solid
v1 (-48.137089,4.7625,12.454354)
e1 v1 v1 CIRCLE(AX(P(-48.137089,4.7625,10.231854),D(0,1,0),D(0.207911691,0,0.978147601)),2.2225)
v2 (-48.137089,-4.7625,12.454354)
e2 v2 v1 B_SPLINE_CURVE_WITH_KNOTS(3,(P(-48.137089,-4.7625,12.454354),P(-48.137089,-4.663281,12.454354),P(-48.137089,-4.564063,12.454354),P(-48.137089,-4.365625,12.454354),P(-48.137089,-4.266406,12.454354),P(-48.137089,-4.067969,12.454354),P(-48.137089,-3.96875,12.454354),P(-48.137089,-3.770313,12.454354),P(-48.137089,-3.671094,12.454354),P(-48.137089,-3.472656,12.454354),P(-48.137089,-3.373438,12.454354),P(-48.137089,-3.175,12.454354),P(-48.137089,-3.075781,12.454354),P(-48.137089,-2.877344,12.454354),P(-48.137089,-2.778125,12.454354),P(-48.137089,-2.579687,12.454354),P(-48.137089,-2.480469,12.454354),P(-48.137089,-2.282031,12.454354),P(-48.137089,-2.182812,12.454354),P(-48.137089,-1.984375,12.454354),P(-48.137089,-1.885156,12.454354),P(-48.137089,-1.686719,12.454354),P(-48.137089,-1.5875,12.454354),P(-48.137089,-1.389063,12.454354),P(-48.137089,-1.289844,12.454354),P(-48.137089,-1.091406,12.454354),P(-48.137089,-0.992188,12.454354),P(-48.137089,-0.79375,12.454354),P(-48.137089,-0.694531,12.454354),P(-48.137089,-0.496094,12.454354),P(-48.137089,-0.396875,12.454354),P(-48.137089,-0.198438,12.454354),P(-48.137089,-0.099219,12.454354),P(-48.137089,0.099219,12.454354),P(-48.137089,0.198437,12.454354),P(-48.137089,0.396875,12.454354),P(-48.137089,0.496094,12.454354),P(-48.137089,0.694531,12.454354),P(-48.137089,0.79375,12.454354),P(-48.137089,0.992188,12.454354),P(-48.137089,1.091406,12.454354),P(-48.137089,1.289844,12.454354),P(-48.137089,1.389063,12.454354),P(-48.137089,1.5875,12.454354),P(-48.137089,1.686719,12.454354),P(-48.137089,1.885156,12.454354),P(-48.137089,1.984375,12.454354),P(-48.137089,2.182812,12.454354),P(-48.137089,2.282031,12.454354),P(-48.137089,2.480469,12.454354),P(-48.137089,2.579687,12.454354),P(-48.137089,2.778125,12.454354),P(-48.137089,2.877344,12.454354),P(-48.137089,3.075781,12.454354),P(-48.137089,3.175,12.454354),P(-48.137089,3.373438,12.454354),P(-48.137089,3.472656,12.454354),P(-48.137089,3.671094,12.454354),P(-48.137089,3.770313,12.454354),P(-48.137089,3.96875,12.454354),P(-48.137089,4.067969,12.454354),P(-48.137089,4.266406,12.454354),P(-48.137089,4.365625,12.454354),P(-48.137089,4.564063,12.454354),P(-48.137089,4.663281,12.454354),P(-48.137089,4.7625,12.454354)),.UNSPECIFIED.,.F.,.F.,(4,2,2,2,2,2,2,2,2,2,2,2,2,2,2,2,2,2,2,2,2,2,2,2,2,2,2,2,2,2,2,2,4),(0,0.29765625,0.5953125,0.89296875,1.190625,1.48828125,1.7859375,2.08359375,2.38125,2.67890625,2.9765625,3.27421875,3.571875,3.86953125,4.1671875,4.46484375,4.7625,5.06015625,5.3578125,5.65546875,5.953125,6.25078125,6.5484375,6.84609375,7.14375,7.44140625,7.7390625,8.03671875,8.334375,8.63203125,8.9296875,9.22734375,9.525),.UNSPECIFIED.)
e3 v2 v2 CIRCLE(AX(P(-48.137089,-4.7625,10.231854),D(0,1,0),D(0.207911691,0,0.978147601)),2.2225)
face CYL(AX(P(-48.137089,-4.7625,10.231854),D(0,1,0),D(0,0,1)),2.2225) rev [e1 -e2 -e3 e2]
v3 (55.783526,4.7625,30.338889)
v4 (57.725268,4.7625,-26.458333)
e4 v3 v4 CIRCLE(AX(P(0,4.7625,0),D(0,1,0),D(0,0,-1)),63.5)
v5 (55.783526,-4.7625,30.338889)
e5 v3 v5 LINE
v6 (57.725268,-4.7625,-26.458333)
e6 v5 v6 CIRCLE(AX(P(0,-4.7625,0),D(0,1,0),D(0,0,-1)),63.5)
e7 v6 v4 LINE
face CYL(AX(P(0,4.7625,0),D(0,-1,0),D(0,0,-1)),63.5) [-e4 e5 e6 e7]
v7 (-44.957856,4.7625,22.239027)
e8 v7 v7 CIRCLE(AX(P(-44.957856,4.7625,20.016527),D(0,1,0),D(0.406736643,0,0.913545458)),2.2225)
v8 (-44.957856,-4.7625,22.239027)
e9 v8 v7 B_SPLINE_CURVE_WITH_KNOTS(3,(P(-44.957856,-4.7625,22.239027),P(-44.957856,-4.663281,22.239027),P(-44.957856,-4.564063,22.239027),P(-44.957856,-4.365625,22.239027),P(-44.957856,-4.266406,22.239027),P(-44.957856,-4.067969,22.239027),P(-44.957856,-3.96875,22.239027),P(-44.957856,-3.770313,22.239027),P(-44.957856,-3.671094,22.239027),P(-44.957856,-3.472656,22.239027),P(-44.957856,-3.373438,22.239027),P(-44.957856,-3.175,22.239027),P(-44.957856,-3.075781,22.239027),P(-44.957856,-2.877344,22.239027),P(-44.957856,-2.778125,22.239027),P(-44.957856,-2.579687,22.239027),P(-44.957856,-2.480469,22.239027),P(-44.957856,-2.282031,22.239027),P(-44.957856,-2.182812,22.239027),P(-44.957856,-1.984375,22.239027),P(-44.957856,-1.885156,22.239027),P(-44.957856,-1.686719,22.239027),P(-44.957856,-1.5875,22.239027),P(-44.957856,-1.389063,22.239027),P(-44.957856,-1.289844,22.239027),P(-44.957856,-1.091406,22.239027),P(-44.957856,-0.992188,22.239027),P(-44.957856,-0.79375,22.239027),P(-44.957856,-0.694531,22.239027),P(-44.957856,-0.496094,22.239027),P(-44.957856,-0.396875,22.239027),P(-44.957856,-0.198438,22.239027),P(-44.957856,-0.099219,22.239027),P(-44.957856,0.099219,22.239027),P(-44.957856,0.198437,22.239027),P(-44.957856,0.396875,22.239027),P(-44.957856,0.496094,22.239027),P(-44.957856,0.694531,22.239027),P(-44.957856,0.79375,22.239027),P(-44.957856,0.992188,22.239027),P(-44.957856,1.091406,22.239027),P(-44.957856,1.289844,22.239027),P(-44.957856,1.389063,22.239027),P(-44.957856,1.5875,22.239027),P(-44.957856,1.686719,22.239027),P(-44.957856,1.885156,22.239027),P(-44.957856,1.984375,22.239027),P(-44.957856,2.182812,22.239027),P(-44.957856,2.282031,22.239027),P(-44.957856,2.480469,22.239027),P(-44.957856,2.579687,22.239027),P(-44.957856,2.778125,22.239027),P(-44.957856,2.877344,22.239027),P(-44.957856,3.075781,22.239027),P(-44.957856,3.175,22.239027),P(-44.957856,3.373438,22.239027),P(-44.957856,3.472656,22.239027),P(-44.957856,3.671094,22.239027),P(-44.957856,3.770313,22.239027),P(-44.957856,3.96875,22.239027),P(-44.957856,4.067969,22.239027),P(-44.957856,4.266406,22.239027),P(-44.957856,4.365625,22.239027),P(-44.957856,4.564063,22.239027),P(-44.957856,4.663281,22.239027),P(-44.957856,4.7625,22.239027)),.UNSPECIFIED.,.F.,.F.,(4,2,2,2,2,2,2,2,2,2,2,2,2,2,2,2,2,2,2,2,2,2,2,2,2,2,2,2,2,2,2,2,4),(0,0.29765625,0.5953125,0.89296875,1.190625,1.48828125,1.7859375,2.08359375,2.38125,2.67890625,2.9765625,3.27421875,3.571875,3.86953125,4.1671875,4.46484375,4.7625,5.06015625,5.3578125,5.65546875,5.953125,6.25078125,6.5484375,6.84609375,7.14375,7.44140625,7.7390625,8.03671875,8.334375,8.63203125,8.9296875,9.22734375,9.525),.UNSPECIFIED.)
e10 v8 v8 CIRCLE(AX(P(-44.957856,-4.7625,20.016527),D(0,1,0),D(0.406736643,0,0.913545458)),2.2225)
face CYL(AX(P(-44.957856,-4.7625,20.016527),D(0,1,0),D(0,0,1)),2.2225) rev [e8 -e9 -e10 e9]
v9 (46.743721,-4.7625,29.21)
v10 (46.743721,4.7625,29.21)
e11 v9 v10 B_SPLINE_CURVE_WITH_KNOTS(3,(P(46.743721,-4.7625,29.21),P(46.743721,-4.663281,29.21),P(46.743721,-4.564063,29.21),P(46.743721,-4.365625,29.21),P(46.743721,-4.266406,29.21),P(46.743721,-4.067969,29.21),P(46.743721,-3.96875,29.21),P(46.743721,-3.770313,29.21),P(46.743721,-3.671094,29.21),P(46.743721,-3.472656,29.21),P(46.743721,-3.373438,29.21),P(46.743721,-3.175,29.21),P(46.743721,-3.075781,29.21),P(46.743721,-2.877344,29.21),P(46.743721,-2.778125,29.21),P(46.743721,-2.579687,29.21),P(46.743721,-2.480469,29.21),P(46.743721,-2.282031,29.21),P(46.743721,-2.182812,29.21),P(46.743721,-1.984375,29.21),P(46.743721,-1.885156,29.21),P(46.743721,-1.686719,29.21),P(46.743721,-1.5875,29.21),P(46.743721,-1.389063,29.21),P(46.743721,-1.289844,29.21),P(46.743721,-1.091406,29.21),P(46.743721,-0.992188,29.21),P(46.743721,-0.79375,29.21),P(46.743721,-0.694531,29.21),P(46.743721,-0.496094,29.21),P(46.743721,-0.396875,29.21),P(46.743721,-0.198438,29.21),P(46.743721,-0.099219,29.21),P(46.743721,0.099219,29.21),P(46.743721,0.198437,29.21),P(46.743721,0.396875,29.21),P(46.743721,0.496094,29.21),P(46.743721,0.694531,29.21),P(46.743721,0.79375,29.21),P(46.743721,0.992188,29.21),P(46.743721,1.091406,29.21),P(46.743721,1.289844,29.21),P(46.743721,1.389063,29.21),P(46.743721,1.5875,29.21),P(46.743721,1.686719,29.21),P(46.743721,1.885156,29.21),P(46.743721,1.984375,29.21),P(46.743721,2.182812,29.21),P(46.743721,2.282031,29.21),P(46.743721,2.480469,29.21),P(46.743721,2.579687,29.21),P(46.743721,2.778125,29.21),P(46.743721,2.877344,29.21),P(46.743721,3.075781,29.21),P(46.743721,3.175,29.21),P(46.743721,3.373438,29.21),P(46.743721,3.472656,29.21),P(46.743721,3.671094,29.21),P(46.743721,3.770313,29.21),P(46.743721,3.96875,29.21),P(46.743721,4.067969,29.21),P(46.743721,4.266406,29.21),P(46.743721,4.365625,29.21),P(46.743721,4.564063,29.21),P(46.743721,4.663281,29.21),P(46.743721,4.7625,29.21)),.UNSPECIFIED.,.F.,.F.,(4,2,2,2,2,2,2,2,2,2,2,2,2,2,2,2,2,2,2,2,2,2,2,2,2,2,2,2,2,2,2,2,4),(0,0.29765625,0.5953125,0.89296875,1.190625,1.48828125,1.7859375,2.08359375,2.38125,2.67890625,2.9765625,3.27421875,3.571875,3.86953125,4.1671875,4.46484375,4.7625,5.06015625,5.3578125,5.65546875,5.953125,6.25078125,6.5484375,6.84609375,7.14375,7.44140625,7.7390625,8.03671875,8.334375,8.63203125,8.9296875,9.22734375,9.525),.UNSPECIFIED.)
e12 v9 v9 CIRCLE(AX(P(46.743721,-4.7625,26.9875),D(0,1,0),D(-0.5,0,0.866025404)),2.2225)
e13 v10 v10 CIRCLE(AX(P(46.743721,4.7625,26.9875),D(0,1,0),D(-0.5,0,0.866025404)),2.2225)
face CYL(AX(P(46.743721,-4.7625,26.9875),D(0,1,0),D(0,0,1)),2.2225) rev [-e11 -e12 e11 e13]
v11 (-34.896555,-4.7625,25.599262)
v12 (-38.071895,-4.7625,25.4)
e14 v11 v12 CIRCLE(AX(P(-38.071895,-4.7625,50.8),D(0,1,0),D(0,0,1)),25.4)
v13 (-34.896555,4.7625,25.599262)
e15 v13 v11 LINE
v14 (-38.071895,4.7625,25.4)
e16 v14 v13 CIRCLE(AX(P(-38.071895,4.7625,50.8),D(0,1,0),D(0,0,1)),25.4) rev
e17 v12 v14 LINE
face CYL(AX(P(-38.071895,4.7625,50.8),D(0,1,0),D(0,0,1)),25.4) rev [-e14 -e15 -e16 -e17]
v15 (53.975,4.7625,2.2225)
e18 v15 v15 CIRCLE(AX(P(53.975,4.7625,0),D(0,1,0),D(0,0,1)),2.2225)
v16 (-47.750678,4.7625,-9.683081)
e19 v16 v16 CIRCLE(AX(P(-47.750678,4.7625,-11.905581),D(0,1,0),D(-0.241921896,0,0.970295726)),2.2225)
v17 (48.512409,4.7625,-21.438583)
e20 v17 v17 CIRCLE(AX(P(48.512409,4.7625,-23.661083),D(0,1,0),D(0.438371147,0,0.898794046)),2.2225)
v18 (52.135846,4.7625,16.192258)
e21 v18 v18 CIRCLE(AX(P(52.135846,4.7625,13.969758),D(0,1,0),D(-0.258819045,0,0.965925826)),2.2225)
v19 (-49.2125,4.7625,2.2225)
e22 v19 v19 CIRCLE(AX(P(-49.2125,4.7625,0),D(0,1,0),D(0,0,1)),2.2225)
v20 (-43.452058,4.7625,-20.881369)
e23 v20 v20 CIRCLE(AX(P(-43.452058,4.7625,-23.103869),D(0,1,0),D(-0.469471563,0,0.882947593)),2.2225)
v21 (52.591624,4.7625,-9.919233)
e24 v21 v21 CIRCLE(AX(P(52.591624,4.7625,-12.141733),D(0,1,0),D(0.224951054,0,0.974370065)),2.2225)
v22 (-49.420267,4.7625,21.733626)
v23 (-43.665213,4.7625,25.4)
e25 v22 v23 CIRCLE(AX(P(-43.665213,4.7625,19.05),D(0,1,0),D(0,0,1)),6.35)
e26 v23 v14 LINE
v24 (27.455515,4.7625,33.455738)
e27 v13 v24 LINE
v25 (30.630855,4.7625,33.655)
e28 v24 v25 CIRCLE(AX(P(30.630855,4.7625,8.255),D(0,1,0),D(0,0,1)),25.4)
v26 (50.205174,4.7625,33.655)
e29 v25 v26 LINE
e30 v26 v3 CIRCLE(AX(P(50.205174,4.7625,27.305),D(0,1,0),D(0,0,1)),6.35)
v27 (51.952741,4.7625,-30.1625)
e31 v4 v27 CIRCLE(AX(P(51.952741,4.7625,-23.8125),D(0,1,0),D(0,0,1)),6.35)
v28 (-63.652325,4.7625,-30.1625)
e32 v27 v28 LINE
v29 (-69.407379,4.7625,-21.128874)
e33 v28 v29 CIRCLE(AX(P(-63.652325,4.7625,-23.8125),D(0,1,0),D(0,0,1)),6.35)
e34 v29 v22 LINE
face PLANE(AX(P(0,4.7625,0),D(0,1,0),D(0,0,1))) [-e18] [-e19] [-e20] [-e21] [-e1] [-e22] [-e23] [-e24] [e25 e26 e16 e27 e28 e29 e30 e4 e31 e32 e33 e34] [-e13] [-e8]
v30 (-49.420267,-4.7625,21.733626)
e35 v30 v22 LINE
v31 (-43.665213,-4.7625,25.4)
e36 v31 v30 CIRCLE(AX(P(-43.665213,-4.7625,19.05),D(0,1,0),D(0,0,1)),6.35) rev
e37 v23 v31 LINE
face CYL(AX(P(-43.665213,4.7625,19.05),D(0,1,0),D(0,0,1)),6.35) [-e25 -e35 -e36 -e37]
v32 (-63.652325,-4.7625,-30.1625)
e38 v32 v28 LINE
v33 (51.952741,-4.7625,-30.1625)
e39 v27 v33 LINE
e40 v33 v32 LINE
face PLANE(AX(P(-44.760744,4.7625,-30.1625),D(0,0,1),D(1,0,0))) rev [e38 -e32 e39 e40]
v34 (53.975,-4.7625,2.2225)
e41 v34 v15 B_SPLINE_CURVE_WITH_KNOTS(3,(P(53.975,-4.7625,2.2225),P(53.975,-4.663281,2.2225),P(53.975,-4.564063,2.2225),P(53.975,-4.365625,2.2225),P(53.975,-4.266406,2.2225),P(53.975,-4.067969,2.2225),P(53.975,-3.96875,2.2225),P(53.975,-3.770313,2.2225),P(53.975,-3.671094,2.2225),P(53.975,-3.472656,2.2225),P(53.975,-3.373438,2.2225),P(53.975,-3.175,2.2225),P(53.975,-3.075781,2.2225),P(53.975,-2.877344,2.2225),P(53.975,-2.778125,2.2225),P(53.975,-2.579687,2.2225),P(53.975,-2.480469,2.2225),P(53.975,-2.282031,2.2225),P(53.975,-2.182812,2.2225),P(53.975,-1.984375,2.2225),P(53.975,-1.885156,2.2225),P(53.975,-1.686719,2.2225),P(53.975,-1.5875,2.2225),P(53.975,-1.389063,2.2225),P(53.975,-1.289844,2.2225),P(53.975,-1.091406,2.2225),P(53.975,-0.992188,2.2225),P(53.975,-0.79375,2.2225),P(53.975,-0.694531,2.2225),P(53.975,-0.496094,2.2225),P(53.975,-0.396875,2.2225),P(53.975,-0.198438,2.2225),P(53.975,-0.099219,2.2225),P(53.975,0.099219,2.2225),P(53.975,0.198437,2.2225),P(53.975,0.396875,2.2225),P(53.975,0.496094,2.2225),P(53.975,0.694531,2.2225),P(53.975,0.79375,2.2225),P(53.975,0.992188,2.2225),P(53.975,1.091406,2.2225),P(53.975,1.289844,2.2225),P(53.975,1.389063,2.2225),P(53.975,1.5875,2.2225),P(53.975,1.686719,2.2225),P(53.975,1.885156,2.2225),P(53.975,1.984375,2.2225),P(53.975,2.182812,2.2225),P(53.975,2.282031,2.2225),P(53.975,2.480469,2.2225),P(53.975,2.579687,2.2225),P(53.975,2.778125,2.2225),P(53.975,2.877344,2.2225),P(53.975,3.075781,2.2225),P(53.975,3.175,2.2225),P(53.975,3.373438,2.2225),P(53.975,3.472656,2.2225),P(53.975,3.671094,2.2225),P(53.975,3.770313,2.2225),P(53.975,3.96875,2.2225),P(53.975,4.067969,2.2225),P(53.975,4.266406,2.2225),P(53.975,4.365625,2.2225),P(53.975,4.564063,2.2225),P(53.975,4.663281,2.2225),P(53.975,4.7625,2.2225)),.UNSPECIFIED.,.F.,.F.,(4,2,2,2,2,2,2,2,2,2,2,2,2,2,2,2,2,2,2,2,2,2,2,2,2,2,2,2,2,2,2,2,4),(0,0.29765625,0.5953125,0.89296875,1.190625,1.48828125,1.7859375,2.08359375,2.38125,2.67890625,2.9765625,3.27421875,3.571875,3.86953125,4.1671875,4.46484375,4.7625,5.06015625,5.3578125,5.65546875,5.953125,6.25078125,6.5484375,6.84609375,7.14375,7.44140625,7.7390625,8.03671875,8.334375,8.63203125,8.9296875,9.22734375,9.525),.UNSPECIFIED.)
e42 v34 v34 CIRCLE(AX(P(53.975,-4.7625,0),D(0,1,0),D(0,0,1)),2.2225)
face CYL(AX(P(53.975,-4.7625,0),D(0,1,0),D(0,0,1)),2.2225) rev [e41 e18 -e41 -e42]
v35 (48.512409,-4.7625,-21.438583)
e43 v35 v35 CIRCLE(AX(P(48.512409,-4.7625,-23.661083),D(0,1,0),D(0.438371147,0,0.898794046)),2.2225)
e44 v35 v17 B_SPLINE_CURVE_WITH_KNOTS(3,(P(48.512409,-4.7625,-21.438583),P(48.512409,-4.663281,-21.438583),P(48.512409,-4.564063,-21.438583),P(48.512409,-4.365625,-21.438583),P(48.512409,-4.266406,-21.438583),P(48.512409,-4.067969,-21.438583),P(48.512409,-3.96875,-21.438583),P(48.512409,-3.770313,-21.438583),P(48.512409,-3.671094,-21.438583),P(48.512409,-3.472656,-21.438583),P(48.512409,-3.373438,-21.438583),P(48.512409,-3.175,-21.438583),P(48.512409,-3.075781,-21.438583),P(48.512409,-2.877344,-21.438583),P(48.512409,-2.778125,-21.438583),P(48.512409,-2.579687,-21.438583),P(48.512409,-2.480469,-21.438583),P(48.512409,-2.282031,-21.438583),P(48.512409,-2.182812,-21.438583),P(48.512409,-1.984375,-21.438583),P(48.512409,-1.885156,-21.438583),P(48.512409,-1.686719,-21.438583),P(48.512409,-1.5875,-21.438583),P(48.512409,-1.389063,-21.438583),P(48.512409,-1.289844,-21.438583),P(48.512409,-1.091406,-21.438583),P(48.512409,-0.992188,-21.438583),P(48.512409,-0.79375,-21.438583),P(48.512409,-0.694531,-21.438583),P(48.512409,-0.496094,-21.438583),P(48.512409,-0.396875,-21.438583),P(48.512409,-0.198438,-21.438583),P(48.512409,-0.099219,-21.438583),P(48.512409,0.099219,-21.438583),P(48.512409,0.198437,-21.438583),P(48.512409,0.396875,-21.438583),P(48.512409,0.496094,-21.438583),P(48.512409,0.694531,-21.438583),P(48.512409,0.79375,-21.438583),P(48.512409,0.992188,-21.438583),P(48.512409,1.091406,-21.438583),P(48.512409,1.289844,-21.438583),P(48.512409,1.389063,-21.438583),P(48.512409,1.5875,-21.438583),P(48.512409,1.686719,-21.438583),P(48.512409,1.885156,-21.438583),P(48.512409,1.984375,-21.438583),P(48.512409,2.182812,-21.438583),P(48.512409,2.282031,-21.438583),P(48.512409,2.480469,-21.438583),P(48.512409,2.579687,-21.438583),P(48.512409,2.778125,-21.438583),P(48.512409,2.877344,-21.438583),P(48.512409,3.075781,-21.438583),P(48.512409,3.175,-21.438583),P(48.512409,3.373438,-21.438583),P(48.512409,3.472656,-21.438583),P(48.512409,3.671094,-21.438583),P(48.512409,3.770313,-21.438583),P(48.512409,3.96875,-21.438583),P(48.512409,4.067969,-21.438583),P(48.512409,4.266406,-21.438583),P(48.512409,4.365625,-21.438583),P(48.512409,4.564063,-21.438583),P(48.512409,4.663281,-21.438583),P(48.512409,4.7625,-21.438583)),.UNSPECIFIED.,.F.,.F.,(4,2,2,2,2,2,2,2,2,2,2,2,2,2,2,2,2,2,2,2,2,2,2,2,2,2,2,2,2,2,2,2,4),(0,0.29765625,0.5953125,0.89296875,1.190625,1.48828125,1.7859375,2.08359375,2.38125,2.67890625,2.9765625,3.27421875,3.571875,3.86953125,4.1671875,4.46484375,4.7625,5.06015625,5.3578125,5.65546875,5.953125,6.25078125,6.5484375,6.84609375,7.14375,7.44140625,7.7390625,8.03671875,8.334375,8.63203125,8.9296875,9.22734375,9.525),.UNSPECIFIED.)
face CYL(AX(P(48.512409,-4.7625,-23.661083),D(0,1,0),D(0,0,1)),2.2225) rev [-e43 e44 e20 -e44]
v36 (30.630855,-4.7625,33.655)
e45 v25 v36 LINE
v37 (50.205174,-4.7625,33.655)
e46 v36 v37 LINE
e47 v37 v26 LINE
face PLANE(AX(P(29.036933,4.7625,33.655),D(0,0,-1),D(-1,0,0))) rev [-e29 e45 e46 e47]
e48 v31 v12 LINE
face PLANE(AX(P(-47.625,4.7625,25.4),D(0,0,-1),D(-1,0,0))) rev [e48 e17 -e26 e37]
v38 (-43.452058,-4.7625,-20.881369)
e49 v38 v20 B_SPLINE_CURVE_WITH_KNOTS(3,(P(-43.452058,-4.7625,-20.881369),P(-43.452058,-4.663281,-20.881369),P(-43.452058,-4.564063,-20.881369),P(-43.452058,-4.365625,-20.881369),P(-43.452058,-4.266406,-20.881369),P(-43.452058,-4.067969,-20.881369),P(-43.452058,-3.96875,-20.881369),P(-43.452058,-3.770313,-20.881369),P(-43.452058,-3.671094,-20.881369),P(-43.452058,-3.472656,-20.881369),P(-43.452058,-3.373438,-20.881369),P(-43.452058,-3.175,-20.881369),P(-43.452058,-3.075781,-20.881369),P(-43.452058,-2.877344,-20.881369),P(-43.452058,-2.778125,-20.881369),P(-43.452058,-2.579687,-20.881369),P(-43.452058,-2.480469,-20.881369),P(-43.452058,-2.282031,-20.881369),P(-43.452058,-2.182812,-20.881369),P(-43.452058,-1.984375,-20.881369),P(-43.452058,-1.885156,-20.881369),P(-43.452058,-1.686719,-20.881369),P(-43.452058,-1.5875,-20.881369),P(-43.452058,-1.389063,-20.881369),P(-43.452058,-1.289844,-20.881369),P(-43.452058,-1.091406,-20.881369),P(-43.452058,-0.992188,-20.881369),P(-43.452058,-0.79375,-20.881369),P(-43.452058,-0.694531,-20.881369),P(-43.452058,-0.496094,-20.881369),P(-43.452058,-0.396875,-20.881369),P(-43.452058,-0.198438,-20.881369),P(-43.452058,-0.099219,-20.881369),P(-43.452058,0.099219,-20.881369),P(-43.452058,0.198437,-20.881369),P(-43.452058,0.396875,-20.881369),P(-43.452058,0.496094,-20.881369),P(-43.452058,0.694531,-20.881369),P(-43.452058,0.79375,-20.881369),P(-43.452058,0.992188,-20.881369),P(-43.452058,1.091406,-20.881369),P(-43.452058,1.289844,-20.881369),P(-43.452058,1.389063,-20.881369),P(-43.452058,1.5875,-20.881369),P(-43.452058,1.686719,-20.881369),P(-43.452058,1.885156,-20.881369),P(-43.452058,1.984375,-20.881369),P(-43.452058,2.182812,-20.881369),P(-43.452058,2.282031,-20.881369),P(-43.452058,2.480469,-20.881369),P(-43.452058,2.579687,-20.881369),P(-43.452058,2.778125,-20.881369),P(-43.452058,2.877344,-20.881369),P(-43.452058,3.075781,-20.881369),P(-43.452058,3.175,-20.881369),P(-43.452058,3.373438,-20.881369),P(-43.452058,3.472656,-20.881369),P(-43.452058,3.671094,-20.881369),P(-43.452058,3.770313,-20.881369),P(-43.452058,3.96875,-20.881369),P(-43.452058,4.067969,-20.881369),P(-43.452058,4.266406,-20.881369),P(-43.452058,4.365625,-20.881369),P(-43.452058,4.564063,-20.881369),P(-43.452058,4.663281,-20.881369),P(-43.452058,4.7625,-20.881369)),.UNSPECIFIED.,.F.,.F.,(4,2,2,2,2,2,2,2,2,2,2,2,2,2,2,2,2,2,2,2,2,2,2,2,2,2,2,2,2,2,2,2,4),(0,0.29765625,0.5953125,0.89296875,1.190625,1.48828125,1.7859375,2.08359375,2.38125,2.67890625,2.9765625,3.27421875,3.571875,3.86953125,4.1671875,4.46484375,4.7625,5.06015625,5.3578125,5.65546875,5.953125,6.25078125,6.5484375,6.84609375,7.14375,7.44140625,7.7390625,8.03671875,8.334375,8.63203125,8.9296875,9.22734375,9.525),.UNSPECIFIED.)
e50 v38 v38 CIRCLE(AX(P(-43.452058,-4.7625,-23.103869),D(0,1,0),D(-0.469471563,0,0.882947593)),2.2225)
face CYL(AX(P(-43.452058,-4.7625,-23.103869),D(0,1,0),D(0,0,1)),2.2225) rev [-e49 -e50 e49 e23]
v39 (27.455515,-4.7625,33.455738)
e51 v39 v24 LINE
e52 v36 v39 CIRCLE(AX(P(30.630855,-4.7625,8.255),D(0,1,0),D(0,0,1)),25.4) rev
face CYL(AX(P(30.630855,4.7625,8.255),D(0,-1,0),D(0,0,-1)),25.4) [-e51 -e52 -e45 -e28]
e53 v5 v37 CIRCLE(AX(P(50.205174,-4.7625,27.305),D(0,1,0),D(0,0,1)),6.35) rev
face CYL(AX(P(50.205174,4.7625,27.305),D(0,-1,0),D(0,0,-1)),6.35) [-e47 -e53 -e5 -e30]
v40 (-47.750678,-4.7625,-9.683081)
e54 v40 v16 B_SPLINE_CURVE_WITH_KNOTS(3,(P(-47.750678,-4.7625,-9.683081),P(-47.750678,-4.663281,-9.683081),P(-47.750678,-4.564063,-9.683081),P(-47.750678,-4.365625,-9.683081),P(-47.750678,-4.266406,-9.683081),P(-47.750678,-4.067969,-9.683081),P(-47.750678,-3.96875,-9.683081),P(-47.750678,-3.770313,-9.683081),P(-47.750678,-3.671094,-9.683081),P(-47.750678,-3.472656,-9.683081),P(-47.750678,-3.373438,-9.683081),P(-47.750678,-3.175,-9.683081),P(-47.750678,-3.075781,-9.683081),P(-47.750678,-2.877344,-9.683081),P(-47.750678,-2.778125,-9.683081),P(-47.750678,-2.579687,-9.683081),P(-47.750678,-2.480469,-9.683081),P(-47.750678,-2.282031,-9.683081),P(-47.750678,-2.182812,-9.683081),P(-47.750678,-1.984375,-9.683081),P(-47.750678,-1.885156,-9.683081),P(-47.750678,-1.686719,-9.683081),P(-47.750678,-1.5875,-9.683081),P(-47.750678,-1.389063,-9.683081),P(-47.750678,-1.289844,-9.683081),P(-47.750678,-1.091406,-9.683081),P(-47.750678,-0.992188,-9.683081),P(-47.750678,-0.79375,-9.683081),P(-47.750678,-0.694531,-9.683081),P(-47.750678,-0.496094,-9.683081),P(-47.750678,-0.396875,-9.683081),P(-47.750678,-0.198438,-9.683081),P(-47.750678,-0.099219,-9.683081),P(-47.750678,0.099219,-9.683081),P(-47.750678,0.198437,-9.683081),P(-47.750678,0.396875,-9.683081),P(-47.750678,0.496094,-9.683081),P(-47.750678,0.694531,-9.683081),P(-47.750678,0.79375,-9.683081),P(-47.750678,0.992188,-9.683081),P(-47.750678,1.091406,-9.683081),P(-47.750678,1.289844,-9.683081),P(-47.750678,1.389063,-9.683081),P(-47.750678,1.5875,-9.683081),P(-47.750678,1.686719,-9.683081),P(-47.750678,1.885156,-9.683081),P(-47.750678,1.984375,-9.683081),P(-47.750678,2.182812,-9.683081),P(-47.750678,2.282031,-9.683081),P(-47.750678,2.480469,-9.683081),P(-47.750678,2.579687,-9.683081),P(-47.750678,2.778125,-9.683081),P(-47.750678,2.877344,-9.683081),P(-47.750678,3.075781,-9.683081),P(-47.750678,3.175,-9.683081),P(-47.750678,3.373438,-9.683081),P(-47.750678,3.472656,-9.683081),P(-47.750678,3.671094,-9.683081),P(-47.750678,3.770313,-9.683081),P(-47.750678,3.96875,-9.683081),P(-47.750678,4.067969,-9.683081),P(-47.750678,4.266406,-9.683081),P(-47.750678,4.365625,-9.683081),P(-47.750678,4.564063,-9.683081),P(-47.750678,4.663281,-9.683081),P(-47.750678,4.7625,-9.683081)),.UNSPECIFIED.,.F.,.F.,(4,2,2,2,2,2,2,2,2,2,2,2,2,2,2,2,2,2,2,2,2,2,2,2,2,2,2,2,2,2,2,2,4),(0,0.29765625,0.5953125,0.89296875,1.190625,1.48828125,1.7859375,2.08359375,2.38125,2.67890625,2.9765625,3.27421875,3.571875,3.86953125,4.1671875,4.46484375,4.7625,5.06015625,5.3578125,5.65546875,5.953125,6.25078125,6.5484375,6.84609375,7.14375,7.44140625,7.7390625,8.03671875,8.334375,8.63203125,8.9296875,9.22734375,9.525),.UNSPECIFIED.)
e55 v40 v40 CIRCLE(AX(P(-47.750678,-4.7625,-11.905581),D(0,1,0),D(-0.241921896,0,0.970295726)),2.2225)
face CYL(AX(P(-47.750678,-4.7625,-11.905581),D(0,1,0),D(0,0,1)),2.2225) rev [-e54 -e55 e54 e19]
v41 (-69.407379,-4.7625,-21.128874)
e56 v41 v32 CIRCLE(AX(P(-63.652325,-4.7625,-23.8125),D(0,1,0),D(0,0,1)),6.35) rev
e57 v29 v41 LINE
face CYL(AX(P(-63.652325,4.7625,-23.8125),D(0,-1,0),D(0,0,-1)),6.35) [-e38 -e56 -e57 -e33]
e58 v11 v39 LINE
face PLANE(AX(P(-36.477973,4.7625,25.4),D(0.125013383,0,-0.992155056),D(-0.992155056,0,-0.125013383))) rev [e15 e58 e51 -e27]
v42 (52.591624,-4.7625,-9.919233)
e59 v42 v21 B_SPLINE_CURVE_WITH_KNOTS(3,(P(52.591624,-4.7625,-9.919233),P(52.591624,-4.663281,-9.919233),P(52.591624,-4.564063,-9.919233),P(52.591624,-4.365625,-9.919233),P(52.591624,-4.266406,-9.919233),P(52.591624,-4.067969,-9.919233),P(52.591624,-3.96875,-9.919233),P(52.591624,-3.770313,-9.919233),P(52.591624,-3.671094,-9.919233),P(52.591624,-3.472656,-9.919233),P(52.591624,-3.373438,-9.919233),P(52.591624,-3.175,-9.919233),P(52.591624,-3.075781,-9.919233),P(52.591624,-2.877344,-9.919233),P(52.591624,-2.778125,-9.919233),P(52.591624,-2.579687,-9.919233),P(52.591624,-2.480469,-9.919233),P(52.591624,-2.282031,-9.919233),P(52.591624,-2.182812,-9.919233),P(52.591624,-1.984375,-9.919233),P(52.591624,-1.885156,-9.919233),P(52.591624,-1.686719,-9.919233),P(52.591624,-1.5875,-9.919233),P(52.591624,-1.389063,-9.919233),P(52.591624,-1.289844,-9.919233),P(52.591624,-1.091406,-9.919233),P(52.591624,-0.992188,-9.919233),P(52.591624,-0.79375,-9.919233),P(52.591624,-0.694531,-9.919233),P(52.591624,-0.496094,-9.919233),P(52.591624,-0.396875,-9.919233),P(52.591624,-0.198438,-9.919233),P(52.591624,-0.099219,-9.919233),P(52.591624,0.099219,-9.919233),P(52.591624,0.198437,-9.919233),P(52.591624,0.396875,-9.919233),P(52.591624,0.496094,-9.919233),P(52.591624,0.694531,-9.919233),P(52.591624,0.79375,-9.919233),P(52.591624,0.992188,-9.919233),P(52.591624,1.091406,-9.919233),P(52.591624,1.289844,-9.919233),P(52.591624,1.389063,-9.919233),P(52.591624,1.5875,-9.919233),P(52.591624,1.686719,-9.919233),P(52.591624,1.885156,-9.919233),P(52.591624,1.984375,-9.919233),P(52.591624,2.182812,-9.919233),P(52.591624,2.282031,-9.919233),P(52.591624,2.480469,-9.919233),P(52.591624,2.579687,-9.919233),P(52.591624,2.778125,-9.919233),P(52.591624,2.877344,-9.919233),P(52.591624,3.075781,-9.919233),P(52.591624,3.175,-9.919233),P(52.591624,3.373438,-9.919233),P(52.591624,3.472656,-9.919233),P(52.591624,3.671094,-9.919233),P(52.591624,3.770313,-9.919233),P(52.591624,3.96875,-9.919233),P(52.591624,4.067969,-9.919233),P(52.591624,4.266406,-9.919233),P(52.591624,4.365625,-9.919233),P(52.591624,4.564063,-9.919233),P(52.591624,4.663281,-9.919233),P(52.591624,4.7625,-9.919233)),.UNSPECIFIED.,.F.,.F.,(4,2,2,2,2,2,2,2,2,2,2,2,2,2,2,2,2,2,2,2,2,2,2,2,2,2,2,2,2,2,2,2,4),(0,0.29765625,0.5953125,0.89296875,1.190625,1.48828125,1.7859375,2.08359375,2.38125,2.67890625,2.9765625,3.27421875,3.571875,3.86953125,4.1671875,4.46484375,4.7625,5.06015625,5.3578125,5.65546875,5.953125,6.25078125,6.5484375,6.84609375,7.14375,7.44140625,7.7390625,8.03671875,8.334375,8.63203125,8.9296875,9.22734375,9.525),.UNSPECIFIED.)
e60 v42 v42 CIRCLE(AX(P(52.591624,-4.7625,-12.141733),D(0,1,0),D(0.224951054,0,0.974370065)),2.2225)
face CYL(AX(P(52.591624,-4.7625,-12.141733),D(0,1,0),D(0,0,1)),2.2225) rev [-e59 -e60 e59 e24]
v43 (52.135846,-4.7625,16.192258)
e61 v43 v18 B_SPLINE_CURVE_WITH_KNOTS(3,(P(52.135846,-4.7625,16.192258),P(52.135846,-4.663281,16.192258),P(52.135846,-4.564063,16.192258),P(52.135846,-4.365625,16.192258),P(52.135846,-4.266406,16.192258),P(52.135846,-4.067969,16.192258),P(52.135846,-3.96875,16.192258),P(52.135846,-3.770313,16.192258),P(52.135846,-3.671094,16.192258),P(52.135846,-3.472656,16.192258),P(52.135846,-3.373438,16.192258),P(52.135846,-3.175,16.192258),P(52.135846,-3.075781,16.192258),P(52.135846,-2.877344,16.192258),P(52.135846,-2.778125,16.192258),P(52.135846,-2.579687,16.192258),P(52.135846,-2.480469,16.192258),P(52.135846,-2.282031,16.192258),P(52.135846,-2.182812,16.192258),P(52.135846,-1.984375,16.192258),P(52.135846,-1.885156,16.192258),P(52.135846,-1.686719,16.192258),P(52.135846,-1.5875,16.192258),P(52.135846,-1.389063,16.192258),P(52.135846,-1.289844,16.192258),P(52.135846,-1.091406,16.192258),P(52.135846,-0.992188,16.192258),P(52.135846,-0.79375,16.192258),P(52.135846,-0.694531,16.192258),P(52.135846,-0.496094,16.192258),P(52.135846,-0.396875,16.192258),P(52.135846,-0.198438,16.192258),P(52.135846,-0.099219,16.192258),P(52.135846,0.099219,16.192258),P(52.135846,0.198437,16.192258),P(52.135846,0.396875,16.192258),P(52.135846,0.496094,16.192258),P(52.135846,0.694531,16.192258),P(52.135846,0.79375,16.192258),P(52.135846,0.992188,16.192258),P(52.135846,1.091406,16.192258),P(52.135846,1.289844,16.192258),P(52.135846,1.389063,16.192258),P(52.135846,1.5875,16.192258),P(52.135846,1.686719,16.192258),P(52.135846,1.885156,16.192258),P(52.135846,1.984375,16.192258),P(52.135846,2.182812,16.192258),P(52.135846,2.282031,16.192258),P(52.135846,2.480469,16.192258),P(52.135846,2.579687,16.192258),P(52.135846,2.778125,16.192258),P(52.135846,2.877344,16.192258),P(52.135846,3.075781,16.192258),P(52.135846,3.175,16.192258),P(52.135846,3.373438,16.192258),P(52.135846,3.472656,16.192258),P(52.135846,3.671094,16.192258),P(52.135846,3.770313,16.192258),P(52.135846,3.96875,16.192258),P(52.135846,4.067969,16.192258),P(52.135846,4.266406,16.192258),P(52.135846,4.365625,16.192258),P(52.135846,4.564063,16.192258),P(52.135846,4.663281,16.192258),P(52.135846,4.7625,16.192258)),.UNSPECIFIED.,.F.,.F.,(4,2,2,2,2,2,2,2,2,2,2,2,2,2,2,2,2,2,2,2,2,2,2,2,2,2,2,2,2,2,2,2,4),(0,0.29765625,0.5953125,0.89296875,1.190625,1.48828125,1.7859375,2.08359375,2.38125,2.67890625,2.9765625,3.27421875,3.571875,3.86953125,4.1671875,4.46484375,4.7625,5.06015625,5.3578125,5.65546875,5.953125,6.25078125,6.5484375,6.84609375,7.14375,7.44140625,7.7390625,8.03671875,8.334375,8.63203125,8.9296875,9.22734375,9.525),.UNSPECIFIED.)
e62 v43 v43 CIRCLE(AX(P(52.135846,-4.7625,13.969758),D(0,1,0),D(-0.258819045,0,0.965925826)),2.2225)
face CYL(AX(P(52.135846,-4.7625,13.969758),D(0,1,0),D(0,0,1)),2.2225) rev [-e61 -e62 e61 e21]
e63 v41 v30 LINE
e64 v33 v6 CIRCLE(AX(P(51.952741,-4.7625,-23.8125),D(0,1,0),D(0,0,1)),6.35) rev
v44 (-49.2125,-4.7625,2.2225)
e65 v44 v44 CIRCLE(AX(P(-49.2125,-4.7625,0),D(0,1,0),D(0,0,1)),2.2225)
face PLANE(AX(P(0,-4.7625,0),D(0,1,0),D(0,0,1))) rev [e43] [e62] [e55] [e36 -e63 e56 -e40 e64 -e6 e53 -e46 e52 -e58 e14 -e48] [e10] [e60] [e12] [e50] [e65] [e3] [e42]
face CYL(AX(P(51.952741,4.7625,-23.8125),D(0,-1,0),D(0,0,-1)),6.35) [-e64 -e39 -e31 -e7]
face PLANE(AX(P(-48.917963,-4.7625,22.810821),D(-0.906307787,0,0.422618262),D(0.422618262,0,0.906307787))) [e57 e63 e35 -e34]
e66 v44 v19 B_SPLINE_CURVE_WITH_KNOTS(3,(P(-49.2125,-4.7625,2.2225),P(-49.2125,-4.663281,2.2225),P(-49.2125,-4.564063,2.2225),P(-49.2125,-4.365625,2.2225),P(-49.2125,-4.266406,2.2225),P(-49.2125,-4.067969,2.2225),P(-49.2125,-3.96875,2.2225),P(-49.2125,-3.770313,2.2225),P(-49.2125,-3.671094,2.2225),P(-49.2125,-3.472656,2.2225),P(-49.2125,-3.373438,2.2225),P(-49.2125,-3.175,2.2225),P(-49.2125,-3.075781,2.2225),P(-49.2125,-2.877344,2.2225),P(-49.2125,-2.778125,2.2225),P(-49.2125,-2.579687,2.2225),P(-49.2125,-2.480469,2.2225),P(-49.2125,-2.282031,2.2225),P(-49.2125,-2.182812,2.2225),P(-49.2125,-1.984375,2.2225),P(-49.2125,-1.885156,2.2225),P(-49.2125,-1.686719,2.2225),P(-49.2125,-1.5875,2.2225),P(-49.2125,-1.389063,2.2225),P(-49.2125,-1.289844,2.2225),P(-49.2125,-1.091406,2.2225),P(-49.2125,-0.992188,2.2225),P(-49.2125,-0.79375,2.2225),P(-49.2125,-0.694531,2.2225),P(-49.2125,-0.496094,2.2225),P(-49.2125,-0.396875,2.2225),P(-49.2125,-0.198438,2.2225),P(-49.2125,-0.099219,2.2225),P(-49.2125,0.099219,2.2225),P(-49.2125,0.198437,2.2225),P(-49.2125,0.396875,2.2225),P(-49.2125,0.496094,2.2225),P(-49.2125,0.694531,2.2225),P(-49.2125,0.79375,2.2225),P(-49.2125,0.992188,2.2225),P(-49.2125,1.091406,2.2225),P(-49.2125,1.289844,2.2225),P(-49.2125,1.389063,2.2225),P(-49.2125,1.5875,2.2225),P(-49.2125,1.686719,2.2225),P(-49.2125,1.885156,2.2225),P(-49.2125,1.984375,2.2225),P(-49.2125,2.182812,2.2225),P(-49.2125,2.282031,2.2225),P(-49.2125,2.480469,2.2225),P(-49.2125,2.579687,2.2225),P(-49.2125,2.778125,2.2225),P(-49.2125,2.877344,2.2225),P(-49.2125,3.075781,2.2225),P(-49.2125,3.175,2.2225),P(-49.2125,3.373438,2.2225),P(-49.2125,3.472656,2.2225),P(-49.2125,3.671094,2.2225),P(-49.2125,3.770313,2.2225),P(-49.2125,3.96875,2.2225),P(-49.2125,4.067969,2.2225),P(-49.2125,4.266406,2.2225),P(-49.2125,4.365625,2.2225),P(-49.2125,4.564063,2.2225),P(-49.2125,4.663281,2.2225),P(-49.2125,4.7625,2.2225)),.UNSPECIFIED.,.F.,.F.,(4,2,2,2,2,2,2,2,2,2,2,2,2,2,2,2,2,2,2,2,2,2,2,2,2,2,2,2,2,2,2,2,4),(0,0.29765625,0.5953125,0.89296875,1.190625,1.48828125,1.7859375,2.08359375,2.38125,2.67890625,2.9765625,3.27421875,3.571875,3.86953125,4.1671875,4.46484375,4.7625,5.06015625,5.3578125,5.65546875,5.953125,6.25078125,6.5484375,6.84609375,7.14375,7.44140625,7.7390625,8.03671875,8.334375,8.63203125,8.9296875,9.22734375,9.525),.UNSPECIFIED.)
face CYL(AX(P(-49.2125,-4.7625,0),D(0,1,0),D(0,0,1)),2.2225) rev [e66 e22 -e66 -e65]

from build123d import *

# Parameters (mm, degrees)
BOSS_EXTRUDE1_DEPTH   = 4.7625
SKETCH2_R             = 2.2225
CUT_EXTRUDE1_DEPTH    = 73.495756083
SKETCH3_R             = 2.2225
CUT_EXTRUDE2_DEPTH    = 73.495756083
CIRPATTERN1_START     = -4.7625
CIRPATTERN1_OUTLINE_R = 2.2225
CIRPATTERN1_DEPTH     = 9.525
CIRPATTERN2_START     = -4.7625
CIRPATTERN2_OUTLINE_R = 2.2225
CIRPATTERN2_DEPTH     = 9.525
BOSS_EXTRUDE2_DEPTH   = 9.525
FILLET1_R             = 6.35
FILLET2_R             = 25.4


# Read off the part's stored shape, not the designer's step: CirPattern1, CirPattern2
with BuildPart() as part:
    # Sketch1 → Boss-Extrude1 (new, symmetric)
    with BuildSketch(Plane(origin=(0, 0, 0), x_dir=(1, 0, 0), z_dir=(0, 1, 0))):
        with BuildLine():
            Line((-44.760744171, 30.1625), (55.879098004, 30.1625))
            ThreePointArc((55.879098004, 30.1625), (63.467858945, -2.02011904), (53.847850236, -33.655))
            Line((53.847850236, -33.655), (29.036932948, -33.655))
            Line((29.036932948, -33.655), (-36.477972806, -25.4))
            Line((-36.477972806, -25.4), (-47.625, -25.4))
            ThreePointArc((-47.625, -25.4), (-53.903425523, 2.778730272), (-44.760744171, 30.1625))
        make_face()
    extrude(amount=BOSS_EXTRUDE1_DEPTH, both=True)

    # Sketch2 → Cut-Extrude1 (cut, through all)
    with BuildSketch(Plane(origin=(0, 4.7625, 0), x_dir=(1, 0, 0), z_dir=(0, 1, 0))):
        with Locations(Location((-49.2125, 0, 0), (0, 0, 270))):
            Circle(SKETCH2_R)
    extrude(amount=-CUT_EXTRUDE1_DEPTH, mode=Mode.SUBTRACT)

    # Sketch3 → Cut-Extrude2 (cut, through all)
    with BuildSketch(Plane(origin=(0, 4.7625, 0), x_dir=(1, 0, 0), z_dir=(0, 1, 0))):
        with Locations(Location((53.975, 0, 0), (0, 0, 270))):
            Circle(SKETCH3_R)
    extrude(amount=-CUT_EXTRUDE2_DEPTH, mode=Mode.SUBTRACT)

    # CirPattern1 outline → CirPattern1 (cut)
    with BuildSketch(Plane(origin=(0, 0, 0), x_dir=(1, 0, 0), z_dir=(0, 1, 0)).offset(CIRPATTERN1_START)):
        with Locations((-47.750678429, 11.905581287)):
            Circle(CIRPATTERN1_OUTLINE_R)
        with Locations((-43.452058414, 23.103869284)):
            Circle(CIRPATTERN1_OUTLINE_R)
        with Locations((-48.137088801, -10.231854084)):
            Circle(CIRPATTERN1_OUTLINE_R)
        with Locations((-44.957855834, -20.016527047)):
            Circle(CIRPATTERN1_OUTLINE_R)
    extrude(amount=CIRPATTERN1_DEPTH, mode=Mode.SUBTRACT)

    # CirPattern2 outline → CirPattern2 (cut)
    with BuildSketch(Plane(origin=(0, 0, 0), x_dir=(1, 0, 0), z_dir=(0, 1, 0)).offset(CIRPATTERN2_START)):
        with Locations((52.591624247, 12.141733158)):
            Circle(CIRPATTERN2_OUTLINE_R)
        with Locations((48.512408649, 23.661082648)):
            Circle(CIRPATTERN2_OUTLINE_R)
        with Locations((52.135846474, -13.969757959)):
            Circle(CIRPATTERN2_OUTLINE_R)
        with Locations((46.743721169, -26.9875)):
            Circle(CIRPATTERN2_OUTLINE_R)
    extrude(amount=CIRPATTERN2_DEPTH, mode=Mode.SUBTRACT)

    # Sketch4 → Boss-Extrude2 (add, through all)
    with BuildSketch(Plane(origin=(0, 4.7625, 0), x_dir=(1, 0, 0), z_dir=(0, 1, 0))):
        with BuildLine():
            Line((-48.917962805, -22.810820677), (-73.619827915, 30.1625))
            Line((-73.619827915, 30.1625), (-44.760744171, 30.1625))
            ThreePointArc((-44.760744171, 30.1625), (-53.809555017, 4.222844291), (-48.917962805, -22.810820677))
        make_face()
    extrude(amount=-BOSS_EXTRUDE2_DEPTH)

    # Fillet1
    fillet1_edges = [part.edges().sort_by_distance(p)[0] for p in [
        (55.879098004, 0, -30.1625),
        (53.847850236, 0, 33.655),
        (-47.625, 0, 25.4),
        (-73.619827915, 0, -30.1625),
    ]]
    fillet(fillet1_edges, radius=FILLET1_R)

    # Fillet2
    fillet2_edges = [part.edges().sort_by_distance(p)[0] for p in [
        (29.036932948, 0, 33.655),
        (-36.477972806, 0, 25.4),
    ]]
    fillet(fillet2_edges, radius=FILLET2_R)


solid = part.part
